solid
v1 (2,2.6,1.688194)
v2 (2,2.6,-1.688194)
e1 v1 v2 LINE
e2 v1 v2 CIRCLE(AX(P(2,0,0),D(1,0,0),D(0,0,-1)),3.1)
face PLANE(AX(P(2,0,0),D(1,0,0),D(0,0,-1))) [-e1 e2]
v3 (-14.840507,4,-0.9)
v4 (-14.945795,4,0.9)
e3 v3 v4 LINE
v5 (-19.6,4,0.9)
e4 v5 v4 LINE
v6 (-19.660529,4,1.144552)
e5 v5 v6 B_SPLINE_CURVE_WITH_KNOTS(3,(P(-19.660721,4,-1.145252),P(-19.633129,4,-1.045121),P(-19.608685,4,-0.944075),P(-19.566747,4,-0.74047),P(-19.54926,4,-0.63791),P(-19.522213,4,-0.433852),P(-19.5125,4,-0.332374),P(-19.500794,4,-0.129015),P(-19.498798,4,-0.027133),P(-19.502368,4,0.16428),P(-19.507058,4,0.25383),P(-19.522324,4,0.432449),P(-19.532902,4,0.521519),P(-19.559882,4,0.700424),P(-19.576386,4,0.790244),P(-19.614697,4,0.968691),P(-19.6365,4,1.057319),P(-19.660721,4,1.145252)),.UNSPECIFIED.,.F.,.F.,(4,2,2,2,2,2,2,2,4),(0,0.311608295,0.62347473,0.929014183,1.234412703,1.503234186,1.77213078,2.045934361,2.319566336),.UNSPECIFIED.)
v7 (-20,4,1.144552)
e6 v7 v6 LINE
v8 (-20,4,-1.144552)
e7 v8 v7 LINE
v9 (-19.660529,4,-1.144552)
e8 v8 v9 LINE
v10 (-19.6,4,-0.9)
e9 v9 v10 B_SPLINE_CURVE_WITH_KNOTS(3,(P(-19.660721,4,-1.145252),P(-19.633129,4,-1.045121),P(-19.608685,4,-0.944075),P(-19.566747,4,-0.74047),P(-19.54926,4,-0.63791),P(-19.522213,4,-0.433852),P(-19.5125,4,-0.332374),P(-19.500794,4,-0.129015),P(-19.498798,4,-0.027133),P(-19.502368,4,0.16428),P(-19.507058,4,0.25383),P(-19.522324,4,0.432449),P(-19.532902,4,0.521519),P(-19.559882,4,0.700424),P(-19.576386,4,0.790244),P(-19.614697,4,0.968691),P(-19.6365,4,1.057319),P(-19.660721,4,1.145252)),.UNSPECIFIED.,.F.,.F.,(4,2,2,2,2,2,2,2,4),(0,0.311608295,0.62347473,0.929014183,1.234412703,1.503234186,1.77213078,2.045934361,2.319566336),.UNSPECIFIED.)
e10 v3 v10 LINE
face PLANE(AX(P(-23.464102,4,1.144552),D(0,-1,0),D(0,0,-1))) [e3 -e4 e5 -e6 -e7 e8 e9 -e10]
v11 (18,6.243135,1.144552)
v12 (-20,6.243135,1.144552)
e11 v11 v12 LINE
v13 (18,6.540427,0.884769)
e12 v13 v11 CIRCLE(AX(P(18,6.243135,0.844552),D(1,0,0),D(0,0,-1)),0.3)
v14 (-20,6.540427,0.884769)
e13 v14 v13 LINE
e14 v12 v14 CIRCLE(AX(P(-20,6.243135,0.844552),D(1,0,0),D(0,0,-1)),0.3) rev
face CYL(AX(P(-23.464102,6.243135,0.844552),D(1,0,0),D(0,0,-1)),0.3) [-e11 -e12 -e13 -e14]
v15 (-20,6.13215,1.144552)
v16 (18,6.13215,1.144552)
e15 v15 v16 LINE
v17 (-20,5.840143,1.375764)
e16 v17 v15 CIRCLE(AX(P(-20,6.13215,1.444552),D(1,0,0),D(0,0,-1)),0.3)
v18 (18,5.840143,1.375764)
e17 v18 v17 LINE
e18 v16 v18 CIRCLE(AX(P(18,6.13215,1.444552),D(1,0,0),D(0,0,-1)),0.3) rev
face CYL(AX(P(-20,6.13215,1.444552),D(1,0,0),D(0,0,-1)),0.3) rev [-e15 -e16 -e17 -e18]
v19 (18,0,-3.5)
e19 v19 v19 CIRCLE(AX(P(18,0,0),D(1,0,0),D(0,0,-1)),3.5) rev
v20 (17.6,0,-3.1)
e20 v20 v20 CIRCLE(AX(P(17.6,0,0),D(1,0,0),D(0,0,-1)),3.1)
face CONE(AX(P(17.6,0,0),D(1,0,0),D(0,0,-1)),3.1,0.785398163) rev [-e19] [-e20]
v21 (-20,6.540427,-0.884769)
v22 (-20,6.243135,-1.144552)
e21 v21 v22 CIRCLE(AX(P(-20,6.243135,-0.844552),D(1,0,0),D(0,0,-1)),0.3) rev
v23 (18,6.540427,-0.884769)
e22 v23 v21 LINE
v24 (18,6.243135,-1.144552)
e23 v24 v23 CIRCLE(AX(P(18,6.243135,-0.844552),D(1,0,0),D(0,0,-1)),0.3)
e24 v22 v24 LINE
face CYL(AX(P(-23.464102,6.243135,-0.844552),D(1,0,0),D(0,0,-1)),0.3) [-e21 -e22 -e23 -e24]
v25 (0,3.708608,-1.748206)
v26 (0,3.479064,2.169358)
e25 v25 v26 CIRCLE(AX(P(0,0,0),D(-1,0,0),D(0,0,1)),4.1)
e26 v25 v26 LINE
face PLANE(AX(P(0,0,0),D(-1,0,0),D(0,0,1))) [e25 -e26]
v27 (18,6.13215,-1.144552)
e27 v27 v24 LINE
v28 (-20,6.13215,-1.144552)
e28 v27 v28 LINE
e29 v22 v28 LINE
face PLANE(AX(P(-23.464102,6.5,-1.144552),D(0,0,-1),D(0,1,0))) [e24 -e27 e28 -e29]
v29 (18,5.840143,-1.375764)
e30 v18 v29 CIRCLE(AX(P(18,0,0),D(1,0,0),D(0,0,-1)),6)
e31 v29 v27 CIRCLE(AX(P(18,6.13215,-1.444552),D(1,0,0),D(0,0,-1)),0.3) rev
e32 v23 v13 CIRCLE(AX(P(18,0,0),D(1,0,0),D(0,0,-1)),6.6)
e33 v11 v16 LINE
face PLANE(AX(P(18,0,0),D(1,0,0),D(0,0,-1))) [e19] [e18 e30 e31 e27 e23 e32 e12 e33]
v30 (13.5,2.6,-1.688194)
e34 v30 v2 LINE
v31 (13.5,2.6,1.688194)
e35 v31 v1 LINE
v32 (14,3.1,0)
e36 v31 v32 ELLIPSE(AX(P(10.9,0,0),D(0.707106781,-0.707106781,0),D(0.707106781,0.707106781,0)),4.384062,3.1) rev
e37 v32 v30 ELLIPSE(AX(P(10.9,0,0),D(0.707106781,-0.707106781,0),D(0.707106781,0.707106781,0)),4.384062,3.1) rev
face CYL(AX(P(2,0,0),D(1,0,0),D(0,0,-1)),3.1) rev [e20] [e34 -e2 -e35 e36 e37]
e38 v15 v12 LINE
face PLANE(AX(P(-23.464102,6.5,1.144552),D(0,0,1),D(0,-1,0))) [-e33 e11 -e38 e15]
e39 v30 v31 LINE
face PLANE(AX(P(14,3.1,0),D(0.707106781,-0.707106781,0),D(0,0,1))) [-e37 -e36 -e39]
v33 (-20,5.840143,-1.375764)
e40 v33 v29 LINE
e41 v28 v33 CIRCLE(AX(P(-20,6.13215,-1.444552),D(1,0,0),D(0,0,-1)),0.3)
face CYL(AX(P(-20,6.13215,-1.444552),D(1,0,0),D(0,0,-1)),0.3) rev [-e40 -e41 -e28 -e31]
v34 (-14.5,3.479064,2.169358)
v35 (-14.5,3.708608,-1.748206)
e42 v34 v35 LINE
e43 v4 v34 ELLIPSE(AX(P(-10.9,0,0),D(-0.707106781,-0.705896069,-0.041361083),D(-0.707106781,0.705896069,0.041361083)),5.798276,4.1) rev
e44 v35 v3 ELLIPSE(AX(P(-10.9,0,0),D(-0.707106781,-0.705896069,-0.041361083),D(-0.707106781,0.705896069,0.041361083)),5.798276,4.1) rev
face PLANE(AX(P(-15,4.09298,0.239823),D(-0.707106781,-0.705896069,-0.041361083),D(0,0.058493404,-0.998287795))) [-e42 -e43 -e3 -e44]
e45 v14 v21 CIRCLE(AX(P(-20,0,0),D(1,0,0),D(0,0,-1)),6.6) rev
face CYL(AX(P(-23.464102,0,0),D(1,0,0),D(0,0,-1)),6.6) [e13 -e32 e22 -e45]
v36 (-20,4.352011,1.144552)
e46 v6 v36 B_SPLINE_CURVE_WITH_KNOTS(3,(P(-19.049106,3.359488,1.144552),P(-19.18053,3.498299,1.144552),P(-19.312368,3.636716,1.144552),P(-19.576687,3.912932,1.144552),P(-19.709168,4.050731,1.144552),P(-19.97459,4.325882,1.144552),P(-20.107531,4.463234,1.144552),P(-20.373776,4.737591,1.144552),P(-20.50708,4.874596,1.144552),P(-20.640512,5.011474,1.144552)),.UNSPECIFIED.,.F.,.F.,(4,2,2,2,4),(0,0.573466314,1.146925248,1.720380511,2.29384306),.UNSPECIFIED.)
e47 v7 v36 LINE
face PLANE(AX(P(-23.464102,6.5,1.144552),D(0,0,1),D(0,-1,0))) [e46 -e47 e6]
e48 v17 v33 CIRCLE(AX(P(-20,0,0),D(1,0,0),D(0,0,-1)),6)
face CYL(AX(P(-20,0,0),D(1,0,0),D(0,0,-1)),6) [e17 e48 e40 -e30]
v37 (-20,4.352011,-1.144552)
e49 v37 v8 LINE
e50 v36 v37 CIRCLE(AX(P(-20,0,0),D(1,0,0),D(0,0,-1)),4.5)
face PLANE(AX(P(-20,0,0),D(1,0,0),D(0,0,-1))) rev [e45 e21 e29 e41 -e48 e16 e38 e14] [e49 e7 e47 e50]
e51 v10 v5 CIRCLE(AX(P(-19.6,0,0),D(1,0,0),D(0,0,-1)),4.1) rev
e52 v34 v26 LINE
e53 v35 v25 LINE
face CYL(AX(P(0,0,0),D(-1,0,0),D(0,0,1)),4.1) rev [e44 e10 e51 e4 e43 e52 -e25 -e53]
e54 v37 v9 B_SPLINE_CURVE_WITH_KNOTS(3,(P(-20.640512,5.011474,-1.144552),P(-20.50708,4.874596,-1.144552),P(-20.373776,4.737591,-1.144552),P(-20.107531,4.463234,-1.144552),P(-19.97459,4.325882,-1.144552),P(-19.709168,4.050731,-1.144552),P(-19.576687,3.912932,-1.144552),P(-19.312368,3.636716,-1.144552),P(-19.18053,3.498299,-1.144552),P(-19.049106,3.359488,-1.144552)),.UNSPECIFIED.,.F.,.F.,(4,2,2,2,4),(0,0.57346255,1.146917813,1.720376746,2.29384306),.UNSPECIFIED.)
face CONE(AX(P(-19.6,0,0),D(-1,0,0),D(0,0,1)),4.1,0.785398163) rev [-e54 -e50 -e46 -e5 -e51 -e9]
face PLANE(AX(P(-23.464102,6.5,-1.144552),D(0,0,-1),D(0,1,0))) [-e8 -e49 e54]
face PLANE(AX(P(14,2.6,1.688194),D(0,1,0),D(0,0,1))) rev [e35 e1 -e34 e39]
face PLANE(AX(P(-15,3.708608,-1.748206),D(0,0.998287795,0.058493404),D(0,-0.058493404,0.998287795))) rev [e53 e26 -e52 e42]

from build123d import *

# Parameters (mm, degrees)
EXTRUDE_1_DEPTH      = 18
EXTRUDE_1_DEPTH_BACK = 20
SKETCH_1_R           = 6
SKETCH_3_R           = 3.1
CUT_EXTRUDE_1_DEPTH  = 16
SKETCH_4_R           = 4.1
CUT_EXTRUDE_2_DEPTH  = 20
EXTRUDE_START        = 12
EXTRUDE_2_DEPTH      = 12
EXTRUDE_START_2      = 15
EXTRUDE_3_DEPTH      = 15
CHAMFER_1_SIZE       = 0.4
CHAMFER_2_SIZE       = 0.5
EXTRUDE_4_REACH      = 40.936
FILLET_1_R           = 0.3


with BuildPart() as part:
    # 草图1 → 凸台-拉伸1 (new, two sides: drawn at the far end of the back side and taken through both)
    with BuildSketch(Plane(origin=(0, 0, 0), x_dir=(0, 0, -1), z_dir=(1, 0, 0)).offset(-EXTRUDE_1_DEPTH_BACK)):
        Circle(SKETCH_1_R)
    extrude(amount=EXTRUDE_1_DEPTH + EXTRUDE_1_DEPTH_BACK)

    # 草图3 → 切除-拉伸1 (cut)
    with BuildSketch(Plane(origin=(18, 0, 0), x_dir=(0, 0, -1), z_dir=(1, 0, 0))):
        Circle(SKETCH_3_R)
    extrude(amount=-CUT_EXTRUDE_1_DEPTH, mode=Mode.SUBTRACT)

    # 草图4 → 切除-拉伸2 (cut)
    with BuildSketch(Plane.ZY.offset(20)):
        Circle(SKETCH_4_R)
    extrude(amount=-CUT_EXTRUDE_2_DEPTH, mode=Mode.SUBTRACT)

    # 草图5 → 凸台-拉伸2 (add)
    with BuildSketch(Plane(origin=(2, 0, 0), x_dir=(0, 0, -1), z_dir=(1, 0, 0)).offset(EXTRUDE_START)):
        with BuildLine():
            Line((-1.688194302, 2.6), (1.688194302, 2.6))
            ThreePointArc((1.688194302, 2.6), (0, 3.1), (-1.688194302, 2.6))
        make_face()
    extrude(amount=-EXTRUDE_2_DEPTH)

    # 草图6 → 凸台-拉伸3 (add)
    with BuildSketch(Plane.ZY.offset(EXTRUDE_START_2)):
        with BuildLine():
            Line((-1.748205844, 3.708608408), (2.169358352, 3.479063716))
            ThreePointArc((2.169358352, 3.479063716), (0.239822956, 4.09297996), (-1.748205844, 3.708608408))
        make_face()
    extrude(amount=-EXTRUDE_3_DEPTH)

    # 倒角1
    chamfer_1_edges = [part.edges().sort_by_distance(p)[0] for p in [
        (-20, 0, -4.1),
        (18, 0, 3.1),
    ]]
    chamfer(chamfer_1_edges, length=CHAMFER_1_SIZE)

    # 倒角2
    chamfer_2_edges = [part.edges().sort_by_distance(p)[0] for p in [
        (-15, 3.593836062, 0.210576254),
        (14, 2.6, 0),
    ]]
    chamfer(chamfer_2_edges, length=CHAMFER_2_SIZE - 0.0001)  # a hair under: the kernel refuses the full size

    # 凸台-拉伸4: up to this face of the body (flat: up to its plane)
    extrude_4_end = Plane(part.part.faces().sort_by_distance((-20, 0, -4.669705627))[0])
    # 草图7 → 凸台-拉伸4 (add, up to the picked face)
    with BuildSketch(Plane(origin=(18, 0, 0), x_dir=(0, 0, -1), z_dir=(1, 0, 0)), mode=Mode.PRIVATE) as extrude_4_sk1:
        with BuildLine():
            Line((-1.144552314, 6.5), (-1.144552314, 4))
            Line((-1.144552314, 4), (1.144552314, 4))
            Line((1.144552314, 4), (1.144552314, 6.5))
            ThreePointArc((1.144552314, 6.5), (0, 6.6), (-1.144552314, 6.5))
        make_face()
    extrude_4_tool1 = split(extrude(extrude_4_sk1.sketch, amount=-EXTRUDE_4_REACH, mode=Mode.PRIVATE), bisect_by=extrude_4_end, keep=Keep.BOTH, mode=Mode.PRIVATE)
    add(extrude_4_tool1.solids().sort_by(Axis((18, 5.283557, 0), (-1, 0, 0)))[0])

    # 圆角1
    fillet_1_edges = [part.edges().sort_by_distance(p)[0] for p in [
        (-1, 5.889821729, -1.144552314),
        (-1, 6.5, -1.144552314),
        (-1, 5.889821729, 1.144552314),
        (-1, 6.5, 1.144552314),
    ]]
    fillet(fillet_1_edges, radius=FILLET_1_R)


solid = part.part
